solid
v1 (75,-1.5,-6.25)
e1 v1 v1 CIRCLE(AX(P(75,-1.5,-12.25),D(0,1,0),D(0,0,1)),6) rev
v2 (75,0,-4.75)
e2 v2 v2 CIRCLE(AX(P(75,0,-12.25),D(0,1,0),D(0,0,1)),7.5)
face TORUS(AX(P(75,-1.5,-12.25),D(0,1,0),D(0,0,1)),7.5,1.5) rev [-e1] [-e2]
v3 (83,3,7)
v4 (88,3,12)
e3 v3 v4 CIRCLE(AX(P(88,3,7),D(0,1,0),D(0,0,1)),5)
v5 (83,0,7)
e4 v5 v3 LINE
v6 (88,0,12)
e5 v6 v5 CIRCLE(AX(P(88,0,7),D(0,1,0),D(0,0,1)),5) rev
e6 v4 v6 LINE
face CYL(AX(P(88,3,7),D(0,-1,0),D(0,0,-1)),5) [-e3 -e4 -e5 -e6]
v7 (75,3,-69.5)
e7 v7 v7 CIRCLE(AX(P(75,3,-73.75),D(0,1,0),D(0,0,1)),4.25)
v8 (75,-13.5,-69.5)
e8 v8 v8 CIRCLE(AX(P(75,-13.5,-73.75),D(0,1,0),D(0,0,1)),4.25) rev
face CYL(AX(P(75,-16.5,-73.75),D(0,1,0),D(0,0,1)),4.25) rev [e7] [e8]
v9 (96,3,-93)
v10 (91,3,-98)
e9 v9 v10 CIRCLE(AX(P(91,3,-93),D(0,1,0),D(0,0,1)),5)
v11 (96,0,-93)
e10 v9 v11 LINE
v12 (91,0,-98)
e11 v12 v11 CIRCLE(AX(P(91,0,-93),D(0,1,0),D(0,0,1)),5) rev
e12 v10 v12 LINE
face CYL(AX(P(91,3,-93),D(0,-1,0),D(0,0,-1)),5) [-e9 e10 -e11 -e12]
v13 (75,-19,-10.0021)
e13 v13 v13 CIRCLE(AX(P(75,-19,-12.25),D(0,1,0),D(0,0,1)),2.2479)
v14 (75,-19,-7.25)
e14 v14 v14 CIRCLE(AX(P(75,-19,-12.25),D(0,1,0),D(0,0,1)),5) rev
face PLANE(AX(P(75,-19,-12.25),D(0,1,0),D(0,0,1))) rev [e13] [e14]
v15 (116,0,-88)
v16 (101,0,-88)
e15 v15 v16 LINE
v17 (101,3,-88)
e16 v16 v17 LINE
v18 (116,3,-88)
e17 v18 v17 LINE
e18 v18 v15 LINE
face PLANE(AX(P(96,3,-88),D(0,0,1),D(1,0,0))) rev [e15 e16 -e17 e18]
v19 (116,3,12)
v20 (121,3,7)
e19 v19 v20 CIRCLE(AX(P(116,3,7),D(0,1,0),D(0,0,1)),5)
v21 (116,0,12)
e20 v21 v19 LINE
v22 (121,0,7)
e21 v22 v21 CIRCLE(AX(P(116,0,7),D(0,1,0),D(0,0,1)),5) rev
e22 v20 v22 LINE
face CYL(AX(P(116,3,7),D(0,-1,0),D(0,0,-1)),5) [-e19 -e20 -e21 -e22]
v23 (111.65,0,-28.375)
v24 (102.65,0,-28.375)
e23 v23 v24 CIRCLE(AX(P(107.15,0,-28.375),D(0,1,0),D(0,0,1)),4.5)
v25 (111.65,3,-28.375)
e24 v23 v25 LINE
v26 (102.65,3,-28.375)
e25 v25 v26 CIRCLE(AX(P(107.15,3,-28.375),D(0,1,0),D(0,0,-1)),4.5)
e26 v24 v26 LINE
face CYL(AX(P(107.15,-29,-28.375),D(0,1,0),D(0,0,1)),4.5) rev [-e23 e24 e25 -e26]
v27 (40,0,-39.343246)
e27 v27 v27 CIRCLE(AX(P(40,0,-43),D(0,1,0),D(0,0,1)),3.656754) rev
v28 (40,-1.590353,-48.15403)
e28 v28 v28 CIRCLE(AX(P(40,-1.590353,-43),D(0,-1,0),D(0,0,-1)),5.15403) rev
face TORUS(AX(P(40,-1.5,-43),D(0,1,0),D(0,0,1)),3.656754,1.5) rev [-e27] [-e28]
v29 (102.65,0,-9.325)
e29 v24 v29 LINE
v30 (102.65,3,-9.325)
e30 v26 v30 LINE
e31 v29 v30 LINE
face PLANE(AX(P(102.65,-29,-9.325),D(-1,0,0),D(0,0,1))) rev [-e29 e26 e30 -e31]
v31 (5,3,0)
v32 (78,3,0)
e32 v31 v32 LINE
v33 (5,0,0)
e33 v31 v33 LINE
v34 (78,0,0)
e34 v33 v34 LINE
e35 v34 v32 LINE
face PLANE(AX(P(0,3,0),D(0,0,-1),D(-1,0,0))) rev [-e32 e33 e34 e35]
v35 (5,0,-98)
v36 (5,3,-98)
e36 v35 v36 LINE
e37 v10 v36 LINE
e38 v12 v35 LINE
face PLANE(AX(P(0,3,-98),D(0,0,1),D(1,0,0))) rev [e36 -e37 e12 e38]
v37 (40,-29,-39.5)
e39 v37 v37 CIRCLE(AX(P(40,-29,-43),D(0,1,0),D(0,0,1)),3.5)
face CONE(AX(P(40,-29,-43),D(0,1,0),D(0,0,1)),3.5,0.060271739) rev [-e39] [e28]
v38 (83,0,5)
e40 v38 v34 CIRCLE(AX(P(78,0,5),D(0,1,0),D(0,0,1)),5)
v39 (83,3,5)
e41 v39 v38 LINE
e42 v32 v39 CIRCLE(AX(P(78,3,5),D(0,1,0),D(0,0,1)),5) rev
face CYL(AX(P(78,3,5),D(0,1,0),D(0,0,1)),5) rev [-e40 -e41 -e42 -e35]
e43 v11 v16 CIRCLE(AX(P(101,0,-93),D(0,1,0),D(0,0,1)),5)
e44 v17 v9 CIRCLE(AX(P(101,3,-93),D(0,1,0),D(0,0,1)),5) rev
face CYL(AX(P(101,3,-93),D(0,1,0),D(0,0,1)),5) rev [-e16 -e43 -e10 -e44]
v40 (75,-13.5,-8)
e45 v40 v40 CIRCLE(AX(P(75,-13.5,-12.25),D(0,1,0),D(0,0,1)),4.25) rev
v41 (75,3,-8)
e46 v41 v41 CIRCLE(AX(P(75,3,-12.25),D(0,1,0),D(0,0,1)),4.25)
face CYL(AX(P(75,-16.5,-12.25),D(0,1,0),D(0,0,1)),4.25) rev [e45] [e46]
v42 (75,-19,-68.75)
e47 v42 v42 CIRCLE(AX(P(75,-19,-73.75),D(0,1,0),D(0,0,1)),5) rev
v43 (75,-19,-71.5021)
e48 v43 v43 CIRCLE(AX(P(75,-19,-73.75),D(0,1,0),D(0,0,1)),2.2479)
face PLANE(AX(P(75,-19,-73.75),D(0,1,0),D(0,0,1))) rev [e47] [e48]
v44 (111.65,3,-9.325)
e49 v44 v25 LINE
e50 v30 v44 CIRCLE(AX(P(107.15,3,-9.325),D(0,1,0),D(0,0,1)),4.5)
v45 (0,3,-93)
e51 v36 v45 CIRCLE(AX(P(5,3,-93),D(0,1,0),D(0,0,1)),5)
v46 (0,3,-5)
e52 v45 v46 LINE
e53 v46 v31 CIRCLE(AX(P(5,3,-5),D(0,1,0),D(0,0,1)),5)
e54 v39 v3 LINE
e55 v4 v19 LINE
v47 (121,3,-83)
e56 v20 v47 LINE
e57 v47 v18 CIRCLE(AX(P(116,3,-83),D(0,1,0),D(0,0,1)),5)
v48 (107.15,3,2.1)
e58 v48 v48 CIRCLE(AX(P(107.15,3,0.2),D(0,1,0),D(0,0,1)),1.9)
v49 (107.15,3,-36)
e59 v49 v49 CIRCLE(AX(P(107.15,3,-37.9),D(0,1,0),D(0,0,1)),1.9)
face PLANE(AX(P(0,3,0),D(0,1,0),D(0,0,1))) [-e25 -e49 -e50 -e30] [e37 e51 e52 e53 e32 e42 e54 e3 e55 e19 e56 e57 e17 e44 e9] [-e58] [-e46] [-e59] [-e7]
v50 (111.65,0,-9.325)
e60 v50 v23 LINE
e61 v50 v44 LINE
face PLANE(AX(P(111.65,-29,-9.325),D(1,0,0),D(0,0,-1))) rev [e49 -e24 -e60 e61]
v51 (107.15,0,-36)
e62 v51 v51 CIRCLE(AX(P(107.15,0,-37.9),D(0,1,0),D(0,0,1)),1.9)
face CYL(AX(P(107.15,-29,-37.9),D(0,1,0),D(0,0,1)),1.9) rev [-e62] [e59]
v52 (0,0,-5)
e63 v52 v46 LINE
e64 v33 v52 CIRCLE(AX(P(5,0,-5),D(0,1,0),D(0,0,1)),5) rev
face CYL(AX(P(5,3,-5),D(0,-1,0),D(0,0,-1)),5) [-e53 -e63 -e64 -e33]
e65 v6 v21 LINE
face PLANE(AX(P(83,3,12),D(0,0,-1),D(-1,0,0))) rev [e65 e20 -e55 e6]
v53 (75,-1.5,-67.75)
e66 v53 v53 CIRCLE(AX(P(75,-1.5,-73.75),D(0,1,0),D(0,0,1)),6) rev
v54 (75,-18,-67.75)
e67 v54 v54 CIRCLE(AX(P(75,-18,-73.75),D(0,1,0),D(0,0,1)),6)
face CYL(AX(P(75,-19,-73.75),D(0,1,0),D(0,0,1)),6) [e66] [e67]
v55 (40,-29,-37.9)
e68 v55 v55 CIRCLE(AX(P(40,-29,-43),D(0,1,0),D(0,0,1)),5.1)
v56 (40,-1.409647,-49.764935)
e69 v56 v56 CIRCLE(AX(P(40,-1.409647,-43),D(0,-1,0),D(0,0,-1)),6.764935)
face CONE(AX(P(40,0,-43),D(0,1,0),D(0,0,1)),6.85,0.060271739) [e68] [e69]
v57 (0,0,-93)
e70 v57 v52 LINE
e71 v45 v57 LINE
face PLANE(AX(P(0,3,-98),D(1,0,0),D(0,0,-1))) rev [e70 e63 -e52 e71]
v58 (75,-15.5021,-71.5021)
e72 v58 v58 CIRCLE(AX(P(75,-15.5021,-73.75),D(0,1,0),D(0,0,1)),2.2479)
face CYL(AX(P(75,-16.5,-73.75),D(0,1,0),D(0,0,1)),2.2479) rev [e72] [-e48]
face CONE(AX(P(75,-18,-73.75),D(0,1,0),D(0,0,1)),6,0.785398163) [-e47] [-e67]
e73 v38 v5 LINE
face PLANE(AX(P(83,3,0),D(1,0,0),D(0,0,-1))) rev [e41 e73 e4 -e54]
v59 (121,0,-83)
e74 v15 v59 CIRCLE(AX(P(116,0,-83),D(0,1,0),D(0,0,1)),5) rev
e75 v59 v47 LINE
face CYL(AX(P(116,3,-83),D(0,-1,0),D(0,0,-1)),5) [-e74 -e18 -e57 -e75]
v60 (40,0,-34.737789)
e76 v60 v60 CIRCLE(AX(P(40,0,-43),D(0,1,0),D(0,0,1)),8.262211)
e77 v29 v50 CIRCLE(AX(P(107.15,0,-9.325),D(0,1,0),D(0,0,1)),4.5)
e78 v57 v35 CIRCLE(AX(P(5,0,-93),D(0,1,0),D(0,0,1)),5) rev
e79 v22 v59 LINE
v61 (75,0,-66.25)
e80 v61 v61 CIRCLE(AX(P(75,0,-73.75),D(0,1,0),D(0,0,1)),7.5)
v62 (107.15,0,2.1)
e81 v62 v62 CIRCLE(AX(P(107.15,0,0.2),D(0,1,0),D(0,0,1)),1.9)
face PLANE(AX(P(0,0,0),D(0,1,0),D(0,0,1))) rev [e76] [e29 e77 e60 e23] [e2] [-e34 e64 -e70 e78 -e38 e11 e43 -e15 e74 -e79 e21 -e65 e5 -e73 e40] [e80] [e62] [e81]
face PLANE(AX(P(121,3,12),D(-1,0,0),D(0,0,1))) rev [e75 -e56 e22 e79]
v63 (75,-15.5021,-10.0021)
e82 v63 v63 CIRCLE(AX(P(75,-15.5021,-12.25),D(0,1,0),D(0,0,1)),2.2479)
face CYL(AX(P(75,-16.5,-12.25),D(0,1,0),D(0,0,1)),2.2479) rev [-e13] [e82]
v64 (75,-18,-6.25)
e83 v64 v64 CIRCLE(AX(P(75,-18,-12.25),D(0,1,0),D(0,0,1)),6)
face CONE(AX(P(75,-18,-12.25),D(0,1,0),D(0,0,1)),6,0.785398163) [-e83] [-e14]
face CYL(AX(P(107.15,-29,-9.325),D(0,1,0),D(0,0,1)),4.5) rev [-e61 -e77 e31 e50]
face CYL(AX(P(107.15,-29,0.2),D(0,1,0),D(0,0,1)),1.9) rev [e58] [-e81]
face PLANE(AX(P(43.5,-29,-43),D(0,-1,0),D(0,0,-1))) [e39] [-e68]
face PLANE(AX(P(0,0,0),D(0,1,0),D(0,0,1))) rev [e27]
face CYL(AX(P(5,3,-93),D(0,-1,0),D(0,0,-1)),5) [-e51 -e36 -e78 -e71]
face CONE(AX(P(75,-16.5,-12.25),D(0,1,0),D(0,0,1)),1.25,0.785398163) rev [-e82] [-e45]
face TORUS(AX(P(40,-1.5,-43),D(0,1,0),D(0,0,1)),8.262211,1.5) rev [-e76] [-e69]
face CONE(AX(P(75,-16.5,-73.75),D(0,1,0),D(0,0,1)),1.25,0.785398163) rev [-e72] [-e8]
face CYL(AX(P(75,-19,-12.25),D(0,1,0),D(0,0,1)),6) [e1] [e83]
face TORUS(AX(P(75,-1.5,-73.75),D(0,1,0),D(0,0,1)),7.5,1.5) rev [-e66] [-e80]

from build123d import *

# Parameters (mm, degrees)
PLATE_DEPTH           = 3
SKETCH2_R             = 6
MOUNT_POSTS_DEPTH     = 22
SKETCH3_R             = 4.25
MOUNT_CBORE_DEPTH     = 19.5
F_8_CLEARANCE_HOLE1_D = 4.4958
FILLET1_R             = 1.5
SKETCH7_R             = 1.9
TERMINAL_STRIP_DEPTH  = 159.962259672
CHAMFER1_SIZE         = 3
CHAMFER2_SIZE         = 1
FILLET3_R             = 1.5
CORNERS_R             = 5


# Some blends are built 0.0001 mm under size
with BuildPart() as part:
    # Sketch1 → plate (new body)
    with BuildSketch(Plane(origin=(0, 0, 0), x_dir=(1, 0, 0), z_dir=(0, 1, 0))):
        Polygon((0, 0), (83, 0), (83, -12), (121, -12), (121, 88), (96, 88), (96, 98), (0, 98), align=None)
    extrude(amount=PLATE_DEPTH)

    # Sketch2 → mount posts (add)
    with BuildSketch(Plane(origin=(0, 3, 0), x_dir=(1, 0, 0), z_dir=(0, 1, 0))):
        with Locations(Location((75, 73.75, 0), (0, 0, 270))):
            Circle(SKETCH2_R)
        with Locations(Location((75, 12.25, 0), (0, 0, 270))):
            Circle(SKETCH2_R)
    extrude(amount=-MOUNT_POSTS_DEPTH)

    # Sketch3 → mount cbore (cut)
    with BuildSketch(Plane(origin=(0, 3, 0), x_dir=(1, 0, 0), z_dir=(0, 1, 0))):
        with Locations(Location((75, 73.75, 0), (0, 0, 270))):
            Circle(SKETCH3_R)
        with Locations(Location((75, 12.25, 0), (0, 0, 270))):
            Circle(SKETCH3_R)
    extrude(amount=-MOUNT_CBORE_DEPTH, mode=Mode.SUBTRACT)

    # #8 Clearance Hole1 (through all)
    with Locations(Plane(origin=(0, -16.5, 0), x_dir=(1, 0, 0), z_dir=(0, 1, 0))):
        with Locations((75, 73.75), (75, 12.25)):
            Hole(F_8_CLEARANCE_HOLE1_D / 2)

    # Sketch8 → foot (revolve)
    with BuildSketch(Plane(origin=(0, 0, -43), x_dir=(1, 0, 0), z_dir=(0, 0, -1)), mode=Mode.PRIVATE) as foot_sk:
        Polygon((45.25, 0), (46.85, 0), (45.1, 29), (43.5, 29), align=None)
    revolve(foot_sk.sketch.rotate(Axis((40, 0, -43), (0, -1, 0)), 90), axis=Axis((40, 0, -43), (0, -1, 0)))

    # Fillet1
    fillet1_edges = [part.edges().sort_by_distance(p)[0] for p in [
        (40, 0, -48.25),
        (40, 0, -49.85),
    ]]
    fillet(fillet1_edges, radius=FILLET1_R)

    # Sketch7 → terminal strip (cut, through all)
    with BuildSketch(Plane(origin=(0, 3, 0), x_dir=(1, 0, 0), z_dir=(0, 1, 0))):
        with Locations(Location((107.15, 37.9, 0), (0, 0, 270))):
            Circle(SKETCH7_R)
        with Locations(Location((107.15, -0.2, 0), (0, 0, 270))):
            Circle(SKETCH7_R)
        with BuildLine():
            Line((102.65, 9.325), (102.65, 28.375))
            ThreePointArc((102.65, 28.375), (107.15, 32.875), (111.65, 28.375))
            Line((111.65, 28.375), (111.65, 9.325))
            ThreePointArc((111.65, 9.325), (107.15, 4.825), (102.65, 9.325))
        make_face()
    extrude(amount=-TERMINAL_STRIP_DEPTH, mode=Mode.SUBTRACT)

    # Chamfer1
    # the kernel refuses this chamfer: 3 mm, written as the material it adds along each edge
    with BuildSketch(Plane(origin=(75, -16.5, -73.75), x_dir=(0, 0, 1), z_dir=(-1, 0, 0))) as chamfer1_piece_1_section:
        Polygon((4.25, CHAMFER1_SIZE), (4.25 - CHAMFER1_SIZE, 0), (4.25, 0), align=None)
    chamfer1_piece_1 = revolve(axis=Axis((75, -16.5, -73.75), (0, 1, 0)), mode=Mode.PRIVATE)
    chamfer1_piece_1 = chamfer1_piece_1 - Plane(origin=(75, -14.490807126, -73.75), x_dir=(-1, 0, 0), z_dir=(0, -1, 0)) * Cylinder(2.2479, 17, mode=Mode.PRIVATE)
    add(chamfer1_piece_1)
    with BuildSketch(Plane(origin=(75, -16.5, -12.25), x_dir=(0, 0, 1), z_dir=(-1, 0, 0))) as chamfer1_piece_2_section:
        Polygon((4.25, CHAMFER1_SIZE), (4.25 - CHAMFER1_SIZE, 0), (4.25, 0), align=None)
    chamfer1_piece_2 = revolve(axis=Axis((75, -16.5, -12.25), (0, 1, 0)), mode=Mode.PRIVATE)
    chamfer1_piece_2 = chamfer1_piece_2 - Plane(origin=(75, -14.490807126, -12.25), x_dir=(-1, 0, 0), z_dir=(0, -1, 0)) * Cylinder(2.2479, 18, mode=Mode.PRIVATE)
    add(chamfer1_piece_2)

    # Chamfer2
    chamfer2_edges = [part.edges().sort_by_distance(p)[0] for p in [
        (75, -19, -79.75),
        (75, -19, -18.25),
    ]]
    chamfer(chamfer2_edges, length=CHAMFER2_SIZE)

    # Fillet3
    fillet3_edges = [part.edges().sort_by_distance(p)[0] for p in [
        (75, 0, -79.75),
        (75, 0, -18.25),
    ]]
    fillet(fillet3_edges, radius=FILLET3_R)

    # corners
    corners_edges = [part.edges().sort_by_distance(p)[0] for p in [
        (0, 1.5, -98),
        (96, 1.5, -98),
        (96, 1.5, -88),
        (121, 1.5, -88),
        (121, 1.5, 12),
        (83, 1.5, 12),
        (83, 1.5, 0),
        (0, 1.5, 0),
    ]]
    fillet(corners_edges, radius=CORNERS_R - 0.0001)  # a hair under: the kernel refuses the full size


solid = part.part
